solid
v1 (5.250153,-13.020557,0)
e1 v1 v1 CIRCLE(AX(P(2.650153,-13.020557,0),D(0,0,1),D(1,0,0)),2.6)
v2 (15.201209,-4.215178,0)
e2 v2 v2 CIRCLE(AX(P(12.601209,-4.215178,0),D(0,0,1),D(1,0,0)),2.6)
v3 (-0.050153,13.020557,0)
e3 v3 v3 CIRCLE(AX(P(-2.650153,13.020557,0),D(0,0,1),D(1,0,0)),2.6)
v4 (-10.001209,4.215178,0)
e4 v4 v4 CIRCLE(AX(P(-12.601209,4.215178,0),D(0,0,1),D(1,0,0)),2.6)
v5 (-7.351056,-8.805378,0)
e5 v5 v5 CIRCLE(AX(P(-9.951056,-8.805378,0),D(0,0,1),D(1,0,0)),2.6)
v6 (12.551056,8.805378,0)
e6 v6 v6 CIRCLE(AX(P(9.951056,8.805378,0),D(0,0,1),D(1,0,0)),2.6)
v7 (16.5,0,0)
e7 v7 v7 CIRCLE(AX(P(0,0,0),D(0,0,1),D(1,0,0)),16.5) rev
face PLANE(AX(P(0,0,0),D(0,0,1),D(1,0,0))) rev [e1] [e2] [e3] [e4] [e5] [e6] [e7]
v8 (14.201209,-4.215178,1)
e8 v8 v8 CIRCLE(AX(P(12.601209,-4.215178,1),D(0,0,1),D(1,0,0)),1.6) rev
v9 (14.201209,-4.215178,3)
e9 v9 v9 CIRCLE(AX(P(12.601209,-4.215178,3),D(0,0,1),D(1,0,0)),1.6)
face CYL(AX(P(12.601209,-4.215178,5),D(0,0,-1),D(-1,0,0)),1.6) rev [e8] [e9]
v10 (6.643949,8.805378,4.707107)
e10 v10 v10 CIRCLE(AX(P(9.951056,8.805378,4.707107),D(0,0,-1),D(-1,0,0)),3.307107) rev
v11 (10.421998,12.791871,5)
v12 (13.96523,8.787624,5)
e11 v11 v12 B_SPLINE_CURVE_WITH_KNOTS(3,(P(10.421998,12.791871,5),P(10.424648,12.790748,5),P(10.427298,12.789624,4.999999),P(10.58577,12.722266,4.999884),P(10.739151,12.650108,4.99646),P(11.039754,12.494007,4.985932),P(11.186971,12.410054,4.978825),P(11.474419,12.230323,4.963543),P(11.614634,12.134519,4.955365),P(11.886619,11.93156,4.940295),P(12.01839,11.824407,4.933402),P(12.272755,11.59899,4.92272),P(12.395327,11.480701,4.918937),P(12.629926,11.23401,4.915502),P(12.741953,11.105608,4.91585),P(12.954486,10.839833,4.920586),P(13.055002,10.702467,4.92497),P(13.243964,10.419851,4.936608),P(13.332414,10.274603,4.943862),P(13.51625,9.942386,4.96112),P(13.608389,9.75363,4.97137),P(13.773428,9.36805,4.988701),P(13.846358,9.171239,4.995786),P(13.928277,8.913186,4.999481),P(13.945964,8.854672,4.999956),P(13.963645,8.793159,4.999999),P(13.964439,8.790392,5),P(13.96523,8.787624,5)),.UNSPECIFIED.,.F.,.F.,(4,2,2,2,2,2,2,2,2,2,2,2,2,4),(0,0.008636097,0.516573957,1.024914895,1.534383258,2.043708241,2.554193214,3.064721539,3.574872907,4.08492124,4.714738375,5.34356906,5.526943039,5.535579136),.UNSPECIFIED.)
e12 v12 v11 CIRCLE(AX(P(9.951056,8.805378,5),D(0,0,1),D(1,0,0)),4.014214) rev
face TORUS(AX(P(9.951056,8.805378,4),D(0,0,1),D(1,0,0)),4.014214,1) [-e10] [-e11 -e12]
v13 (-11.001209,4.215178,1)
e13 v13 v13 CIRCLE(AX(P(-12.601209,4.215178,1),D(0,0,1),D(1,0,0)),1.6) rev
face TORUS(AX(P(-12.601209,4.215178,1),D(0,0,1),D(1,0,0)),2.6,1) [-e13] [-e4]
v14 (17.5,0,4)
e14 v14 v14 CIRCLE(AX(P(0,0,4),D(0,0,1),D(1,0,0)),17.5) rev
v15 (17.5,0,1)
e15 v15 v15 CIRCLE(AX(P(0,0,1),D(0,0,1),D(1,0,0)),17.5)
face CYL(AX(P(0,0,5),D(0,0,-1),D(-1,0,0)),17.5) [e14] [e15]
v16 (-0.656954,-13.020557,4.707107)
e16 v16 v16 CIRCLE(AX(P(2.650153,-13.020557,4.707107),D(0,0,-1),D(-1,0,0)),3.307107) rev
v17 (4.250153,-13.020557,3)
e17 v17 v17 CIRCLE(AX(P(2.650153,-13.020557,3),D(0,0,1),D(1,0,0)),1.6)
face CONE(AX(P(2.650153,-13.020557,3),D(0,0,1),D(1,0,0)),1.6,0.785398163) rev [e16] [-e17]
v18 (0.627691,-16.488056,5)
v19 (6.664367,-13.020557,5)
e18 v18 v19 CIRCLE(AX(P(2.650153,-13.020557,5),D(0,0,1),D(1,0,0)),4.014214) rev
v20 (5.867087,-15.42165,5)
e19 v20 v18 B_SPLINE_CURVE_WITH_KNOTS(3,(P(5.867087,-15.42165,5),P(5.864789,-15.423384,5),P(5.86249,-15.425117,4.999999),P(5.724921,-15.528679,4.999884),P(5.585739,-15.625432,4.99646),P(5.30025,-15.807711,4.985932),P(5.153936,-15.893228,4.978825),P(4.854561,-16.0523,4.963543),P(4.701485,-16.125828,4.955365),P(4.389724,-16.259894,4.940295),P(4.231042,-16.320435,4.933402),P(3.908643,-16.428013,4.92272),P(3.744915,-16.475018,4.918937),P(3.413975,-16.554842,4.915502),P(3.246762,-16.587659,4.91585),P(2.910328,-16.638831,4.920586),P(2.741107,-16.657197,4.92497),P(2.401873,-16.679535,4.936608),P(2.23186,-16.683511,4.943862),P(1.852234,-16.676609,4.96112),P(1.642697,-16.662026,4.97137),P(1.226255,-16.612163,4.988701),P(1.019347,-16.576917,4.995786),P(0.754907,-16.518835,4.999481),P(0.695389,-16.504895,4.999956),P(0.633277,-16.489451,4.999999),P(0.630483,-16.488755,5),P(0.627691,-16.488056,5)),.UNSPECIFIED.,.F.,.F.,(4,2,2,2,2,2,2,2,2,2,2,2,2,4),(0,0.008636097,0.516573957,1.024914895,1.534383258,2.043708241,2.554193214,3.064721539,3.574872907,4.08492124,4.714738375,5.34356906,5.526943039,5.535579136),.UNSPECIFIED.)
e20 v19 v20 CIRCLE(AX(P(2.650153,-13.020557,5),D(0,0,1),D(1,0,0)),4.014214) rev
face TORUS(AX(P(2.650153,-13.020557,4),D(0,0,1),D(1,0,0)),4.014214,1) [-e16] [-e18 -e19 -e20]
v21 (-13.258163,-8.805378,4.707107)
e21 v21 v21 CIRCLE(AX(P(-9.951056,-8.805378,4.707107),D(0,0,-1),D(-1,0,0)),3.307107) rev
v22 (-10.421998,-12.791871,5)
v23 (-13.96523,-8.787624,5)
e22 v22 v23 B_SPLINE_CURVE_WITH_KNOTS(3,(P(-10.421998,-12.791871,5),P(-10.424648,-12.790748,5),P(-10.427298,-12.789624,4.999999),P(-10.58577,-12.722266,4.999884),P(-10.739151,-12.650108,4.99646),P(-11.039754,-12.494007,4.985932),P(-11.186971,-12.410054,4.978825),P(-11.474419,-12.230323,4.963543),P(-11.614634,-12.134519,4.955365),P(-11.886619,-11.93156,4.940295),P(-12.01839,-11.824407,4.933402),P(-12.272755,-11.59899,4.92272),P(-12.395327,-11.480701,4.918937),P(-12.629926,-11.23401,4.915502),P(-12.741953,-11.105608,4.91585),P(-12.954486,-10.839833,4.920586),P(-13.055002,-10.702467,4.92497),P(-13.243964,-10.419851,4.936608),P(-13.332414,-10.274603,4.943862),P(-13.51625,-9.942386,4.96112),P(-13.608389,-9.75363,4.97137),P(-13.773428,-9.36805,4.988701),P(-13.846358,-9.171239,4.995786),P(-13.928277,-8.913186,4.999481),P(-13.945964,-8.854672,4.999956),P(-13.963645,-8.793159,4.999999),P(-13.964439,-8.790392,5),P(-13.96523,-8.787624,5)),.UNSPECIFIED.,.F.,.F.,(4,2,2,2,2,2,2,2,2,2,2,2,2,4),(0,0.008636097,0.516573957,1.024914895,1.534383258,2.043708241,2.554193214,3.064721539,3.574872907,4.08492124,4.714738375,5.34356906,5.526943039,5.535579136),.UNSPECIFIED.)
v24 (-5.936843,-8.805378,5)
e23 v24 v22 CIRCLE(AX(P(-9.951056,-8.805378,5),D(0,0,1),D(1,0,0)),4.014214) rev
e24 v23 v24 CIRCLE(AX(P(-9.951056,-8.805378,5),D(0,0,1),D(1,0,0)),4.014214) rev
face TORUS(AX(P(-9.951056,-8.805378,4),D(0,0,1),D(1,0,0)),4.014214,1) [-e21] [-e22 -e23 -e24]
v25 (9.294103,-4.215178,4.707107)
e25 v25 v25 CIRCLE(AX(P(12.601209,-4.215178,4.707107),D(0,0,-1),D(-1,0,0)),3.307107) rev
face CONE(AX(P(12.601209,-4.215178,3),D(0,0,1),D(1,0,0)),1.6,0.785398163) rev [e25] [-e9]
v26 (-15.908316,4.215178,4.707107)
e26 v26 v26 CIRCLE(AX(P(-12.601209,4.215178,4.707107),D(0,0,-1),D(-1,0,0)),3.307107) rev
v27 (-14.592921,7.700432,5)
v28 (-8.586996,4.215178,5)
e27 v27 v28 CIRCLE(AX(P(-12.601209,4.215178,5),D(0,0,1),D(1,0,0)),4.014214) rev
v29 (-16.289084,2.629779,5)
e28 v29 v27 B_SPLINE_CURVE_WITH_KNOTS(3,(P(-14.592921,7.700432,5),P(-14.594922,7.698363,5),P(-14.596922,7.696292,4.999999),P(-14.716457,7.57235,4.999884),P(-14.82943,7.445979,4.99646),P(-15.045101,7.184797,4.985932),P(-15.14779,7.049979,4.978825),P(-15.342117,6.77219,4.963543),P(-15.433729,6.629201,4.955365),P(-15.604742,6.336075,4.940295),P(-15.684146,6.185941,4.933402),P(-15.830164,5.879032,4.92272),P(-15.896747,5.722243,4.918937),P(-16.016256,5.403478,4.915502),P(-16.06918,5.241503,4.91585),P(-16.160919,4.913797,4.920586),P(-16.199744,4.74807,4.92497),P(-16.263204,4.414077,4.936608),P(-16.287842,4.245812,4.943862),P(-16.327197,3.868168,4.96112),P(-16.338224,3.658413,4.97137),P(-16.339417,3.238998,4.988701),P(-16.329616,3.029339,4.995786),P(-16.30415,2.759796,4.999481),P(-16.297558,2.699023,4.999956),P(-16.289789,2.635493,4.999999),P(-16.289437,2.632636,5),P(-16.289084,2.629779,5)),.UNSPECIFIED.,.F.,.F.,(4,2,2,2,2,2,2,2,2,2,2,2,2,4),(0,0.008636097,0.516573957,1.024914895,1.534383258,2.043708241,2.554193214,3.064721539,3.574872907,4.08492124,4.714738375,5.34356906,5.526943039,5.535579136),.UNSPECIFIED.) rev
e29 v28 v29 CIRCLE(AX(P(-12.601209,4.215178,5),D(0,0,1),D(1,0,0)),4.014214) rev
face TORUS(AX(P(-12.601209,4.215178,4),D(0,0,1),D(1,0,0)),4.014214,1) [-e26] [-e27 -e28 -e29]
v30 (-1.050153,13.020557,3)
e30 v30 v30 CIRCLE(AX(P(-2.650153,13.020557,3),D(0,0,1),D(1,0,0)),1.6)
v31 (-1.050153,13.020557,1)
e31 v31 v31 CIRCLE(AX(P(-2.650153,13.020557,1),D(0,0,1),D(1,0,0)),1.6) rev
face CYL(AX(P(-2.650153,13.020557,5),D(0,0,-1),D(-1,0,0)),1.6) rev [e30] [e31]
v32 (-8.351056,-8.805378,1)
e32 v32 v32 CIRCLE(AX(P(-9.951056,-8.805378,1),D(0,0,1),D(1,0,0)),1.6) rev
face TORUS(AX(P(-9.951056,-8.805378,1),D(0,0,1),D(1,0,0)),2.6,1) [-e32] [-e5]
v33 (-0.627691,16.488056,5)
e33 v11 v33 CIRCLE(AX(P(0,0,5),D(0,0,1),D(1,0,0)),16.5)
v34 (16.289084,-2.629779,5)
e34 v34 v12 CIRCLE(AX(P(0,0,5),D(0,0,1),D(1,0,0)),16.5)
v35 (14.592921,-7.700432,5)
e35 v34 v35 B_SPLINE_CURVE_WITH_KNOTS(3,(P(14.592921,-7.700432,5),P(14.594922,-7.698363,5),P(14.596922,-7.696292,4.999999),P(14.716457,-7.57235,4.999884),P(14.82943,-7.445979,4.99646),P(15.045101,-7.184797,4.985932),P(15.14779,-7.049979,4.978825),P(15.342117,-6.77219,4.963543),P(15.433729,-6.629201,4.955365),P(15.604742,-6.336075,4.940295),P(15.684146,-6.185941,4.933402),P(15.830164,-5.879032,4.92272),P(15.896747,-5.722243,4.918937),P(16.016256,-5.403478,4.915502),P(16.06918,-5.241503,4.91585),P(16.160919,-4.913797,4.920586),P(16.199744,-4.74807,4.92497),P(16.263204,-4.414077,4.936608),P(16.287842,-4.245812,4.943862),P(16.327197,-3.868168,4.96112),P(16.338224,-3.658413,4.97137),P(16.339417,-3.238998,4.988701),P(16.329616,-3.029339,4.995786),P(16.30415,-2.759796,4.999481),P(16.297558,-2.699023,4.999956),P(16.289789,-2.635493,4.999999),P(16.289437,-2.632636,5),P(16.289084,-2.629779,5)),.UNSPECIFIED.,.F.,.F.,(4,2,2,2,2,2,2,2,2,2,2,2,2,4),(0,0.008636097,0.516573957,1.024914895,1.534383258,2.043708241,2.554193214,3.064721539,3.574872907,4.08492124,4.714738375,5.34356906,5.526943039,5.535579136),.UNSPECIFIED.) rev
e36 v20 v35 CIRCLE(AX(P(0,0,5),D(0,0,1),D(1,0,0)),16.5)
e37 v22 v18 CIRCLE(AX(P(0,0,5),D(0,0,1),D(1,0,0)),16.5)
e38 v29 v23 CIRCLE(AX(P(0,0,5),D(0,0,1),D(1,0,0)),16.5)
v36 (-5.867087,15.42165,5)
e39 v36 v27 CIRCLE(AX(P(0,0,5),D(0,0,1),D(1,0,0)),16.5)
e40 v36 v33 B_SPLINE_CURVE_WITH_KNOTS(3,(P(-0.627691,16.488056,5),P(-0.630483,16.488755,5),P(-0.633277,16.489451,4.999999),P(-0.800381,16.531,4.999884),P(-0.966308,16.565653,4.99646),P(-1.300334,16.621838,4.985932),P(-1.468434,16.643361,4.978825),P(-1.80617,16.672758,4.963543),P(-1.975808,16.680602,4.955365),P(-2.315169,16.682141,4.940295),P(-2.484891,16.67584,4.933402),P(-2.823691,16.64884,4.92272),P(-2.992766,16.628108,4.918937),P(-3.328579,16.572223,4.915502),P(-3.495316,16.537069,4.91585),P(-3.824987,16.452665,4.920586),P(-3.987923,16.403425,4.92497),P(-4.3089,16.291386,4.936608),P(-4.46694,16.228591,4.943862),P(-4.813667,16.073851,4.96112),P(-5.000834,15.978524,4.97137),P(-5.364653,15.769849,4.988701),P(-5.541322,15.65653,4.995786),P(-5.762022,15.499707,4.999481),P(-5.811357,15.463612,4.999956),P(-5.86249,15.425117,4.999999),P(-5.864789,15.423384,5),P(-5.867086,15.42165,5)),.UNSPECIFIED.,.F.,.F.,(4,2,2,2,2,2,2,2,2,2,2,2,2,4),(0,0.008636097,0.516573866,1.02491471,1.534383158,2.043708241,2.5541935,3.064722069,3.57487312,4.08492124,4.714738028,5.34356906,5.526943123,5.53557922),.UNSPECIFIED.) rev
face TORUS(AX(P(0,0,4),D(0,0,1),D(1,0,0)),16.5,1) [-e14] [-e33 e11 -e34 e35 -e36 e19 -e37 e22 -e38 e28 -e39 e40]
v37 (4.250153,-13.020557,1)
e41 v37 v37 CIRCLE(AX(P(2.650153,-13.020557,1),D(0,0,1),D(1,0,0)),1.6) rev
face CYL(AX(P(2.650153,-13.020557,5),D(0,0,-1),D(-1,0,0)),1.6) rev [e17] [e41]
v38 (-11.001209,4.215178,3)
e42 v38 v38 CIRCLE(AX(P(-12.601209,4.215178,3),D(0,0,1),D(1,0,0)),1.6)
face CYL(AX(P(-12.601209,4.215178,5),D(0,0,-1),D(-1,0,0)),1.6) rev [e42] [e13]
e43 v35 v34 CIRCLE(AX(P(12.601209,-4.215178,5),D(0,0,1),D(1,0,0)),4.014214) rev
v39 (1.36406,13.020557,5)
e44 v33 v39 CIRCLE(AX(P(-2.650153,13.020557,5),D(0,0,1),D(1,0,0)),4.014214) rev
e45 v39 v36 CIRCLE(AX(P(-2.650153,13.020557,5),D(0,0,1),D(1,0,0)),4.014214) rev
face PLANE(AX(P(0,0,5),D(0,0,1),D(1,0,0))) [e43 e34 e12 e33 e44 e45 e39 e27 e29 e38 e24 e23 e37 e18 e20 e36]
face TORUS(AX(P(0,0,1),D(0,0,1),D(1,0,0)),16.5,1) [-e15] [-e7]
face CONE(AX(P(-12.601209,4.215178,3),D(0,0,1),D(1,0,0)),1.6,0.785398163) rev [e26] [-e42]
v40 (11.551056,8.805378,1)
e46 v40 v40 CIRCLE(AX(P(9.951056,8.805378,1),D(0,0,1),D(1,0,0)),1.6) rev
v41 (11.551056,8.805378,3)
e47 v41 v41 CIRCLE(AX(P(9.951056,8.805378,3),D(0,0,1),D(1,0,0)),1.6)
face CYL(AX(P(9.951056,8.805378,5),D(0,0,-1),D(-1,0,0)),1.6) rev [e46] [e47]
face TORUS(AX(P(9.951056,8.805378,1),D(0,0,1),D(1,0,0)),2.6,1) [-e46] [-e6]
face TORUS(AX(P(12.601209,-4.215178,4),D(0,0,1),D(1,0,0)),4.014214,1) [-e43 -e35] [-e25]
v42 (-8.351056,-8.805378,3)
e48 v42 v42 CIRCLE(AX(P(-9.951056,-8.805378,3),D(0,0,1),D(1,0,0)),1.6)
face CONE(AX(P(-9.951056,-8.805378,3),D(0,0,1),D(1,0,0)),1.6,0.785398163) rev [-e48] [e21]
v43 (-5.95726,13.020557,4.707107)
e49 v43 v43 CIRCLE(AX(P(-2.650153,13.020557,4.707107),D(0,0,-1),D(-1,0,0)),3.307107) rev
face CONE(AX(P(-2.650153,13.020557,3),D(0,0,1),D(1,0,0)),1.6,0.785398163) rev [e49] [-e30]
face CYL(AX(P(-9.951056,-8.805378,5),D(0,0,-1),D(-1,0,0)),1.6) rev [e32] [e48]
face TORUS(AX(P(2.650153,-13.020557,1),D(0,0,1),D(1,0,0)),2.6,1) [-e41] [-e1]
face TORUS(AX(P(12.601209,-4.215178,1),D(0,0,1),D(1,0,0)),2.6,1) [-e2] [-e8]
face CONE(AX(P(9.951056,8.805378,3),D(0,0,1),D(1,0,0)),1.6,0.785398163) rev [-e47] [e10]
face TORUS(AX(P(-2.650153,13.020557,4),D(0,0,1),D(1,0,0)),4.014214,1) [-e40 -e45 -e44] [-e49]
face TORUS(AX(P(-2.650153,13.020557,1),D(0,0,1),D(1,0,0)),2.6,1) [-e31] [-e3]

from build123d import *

# Parameters (mm, degrees)
ESQUISSE1_R        = 17.5
ESQUISSE1_R_2      = 1.6
BOSS_EXTRU_1_DEPTH = 5
CHANFREIN1_SIZE    = 2
CONG_2_R           = 1


with BuildPart() as part:
    # Esquisse1 → Boss.-Extru.1 (new body)
    with BuildSketch(Plane.XY):
        Circle(ESQUISSE1_R)
        with Locations((-2.65015328, 13.020556544)):
            Circle(ESQUISSE1_R_2, mode=Mode.SUBTRACT)
        with Locations((9.951056099, 8.805378336)):
            Circle(ESQUISSE1_R_2, mode=Mode.SUBTRACT)
        with Locations((12.601209379, -4.215178208)):
            Circle(ESQUISSE1_R_2, mode=Mode.SUBTRACT)
        with Locations((2.65015328, -13.020556544)):
            Circle(ESQUISSE1_R_2, mode=Mode.SUBTRACT)
        with Locations((-9.951056099, -8.805378336)):
            Circle(ESQUISSE1_R_2, mode=Mode.SUBTRACT)
        with Locations((-12.601209379, 4.215178208)):
            Circle(ESQUISSE1_R_2, mode=Mode.SUBTRACT)
    extrude(amount=BOSS_EXTRU_1_DEPTH)

    # Chanfrein1
    chanfrein1_edges = [part.edges().sort_by_distance(p)[0] for p in [
        (-14.201209379, 4.215178208, 5),
        (-11.551056099, -8.805378336, 5),
        (1.05015328, -13.020556544, 5),
        (11.001209379, -4.215178208, 5),
        (8.351056099, 8.805378336, 5),
        (-4.25015328, 13.020556544, 5),
    ]]
    chamfer(chanfrein1_edges, length=CHANFREIN1_SIZE)

    # Congé2
    # the kernel refuses this fillet: 1 mm, written as the material it takes off along each edge
    with BuildSketch(Plane(origin=(12.601209379, -4.215178208, 0), x_dir=(1, 0, 0), z_dir=(0, -1, 0))) as cong_2_piece_1:
        with BuildLine():
            CenterArc((1.6 + CONG_2_R, CONG_2_R), CONG_2_R, 180, 90)
            Line((1.6, CONG_2_R), (1.6, 0))
            Line((1.6, 0), (1.6 + CONG_2_R, 0))
        make_face()
    revolve(axis=Axis((12.601209379, -4.215178208, 0), (0, 0, 1)), mode=Mode.SUBTRACT)
    with BuildSketch(Plane(origin=(2.65015328, -13.020556544, 0), x_dir=(1, 0, 0), z_dir=(0, -1, 0))) as cong_2_piece_2:
        with BuildLine():
            CenterArc((1.6 + CONG_2_R, CONG_2_R), CONG_2_R, 180, 90)
            Line((1.6, CONG_2_R), (1.6, 0))
            Line((1.6, 0), (1.6 + CONG_2_R, 0))
        make_face()
    revolve(axis=Axis((2.65015328, -13.020556544, 0), (0, 0, 1)), mode=Mode.SUBTRACT)
    with BuildSketch(Plane(origin=(-9.951056099, -8.805378336, 0), x_dir=(1, 0, 0), z_dir=(0, -1, 0))) as cong_2_piece_3:
        with BuildLine():
            CenterArc((1.6 + CONG_2_R, CONG_2_R), CONG_2_R, 180, 90)
            Line((1.6, CONG_2_R), (1.6, 0))
            Line((1.6, 0), (1.6 + CONG_2_R, 0))
        make_face()
    revolve(axis=Axis((-9.951056099, -8.805378336, 0), (0, 0, 1)), mode=Mode.SUBTRACT)
    with BuildSketch(Plane(origin=(-12.601209379, 4.215178208, 0), x_dir=(1, 0, 0), z_dir=(0, -1, 0))) as cong_2_piece_4:
        with BuildLine():
            CenterArc((1.6 + CONG_2_R, CONG_2_R), CONG_2_R, 180, 90)
            Line((1.6, CONG_2_R), (1.6, 0))
            Line((1.6, 0), (1.6 + CONG_2_R, 0))
        make_face()
    revolve(axis=Axis((-12.601209379, 4.215178208, 0), (0, 0, 1)), mode=Mode.SUBTRACT)
    with BuildSketch(Plane(origin=(-12.601209379, 4.215178208, 5), x_dir=(1, 0, 0), z_dir=(0, -1, 0))) as cong_2_piece_5:
        with BuildLine():
            CenterArc((3.6 + CONG_2_R * 0.414213562373, -CONG_2_R), CONG_2_R, 90, 45)
            Line((3.6 - CONG_2_R * 0.292893218813, -CONG_2_R * 0.292893218813), (3.6, 0))
            Line((3.6, 0), (3.6 + CONG_2_R * 0.414213562373, 0))
        make_face()
    revolve(axis=Axis((-12.601209379, 4.215178208, 5), (0, 0, 1)), mode=Mode.SUBTRACT)
    with BuildSketch(Plane(origin=(-9.951056099, -8.805378336, 5), x_dir=(1, 0, 0), z_dir=(0, -1, 0))) as cong_2_piece_6:
        with BuildLine():
            CenterArc((3.6 + CONG_2_R * 0.414213562373, -CONG_2_R), CONG_2_R, 90, 45)
            Line((3.6 - CONG_2_R * 0.292893218813, -CONG_2_R * 0.292893218813), (3.6, 0))
            Line((3.6, 0), (3.6 + CONG_2_R * 0.414213562373, 0))
        make_face()
    revolve(axis=Axis((-9.951056099, -8.805378336, 5), (0, 0, 1)), mode=Mode.SUBTRACT)
    with BuildSketch(Plane(origin=(2.65015328, -13.020556544, 5), x_dir=(1, 0, 0), z_dir=(0, -1, 0))) as cong_2_piece_7:
        with BuildLine():
            CenterArc((3.6 + CONG_2_R * 0.414213562373, -CONG_2_R), CONG_2_R, 90, 45)
            Line((3.6 - CONG_2_R * 0.292893218813, -CONG_2_R * 0.292893218813), (3.6, 0))
            Line((3.6, 0), (3.6 + CONG_2_R * 0.414213562373, 0))
        make_face()
    revolve(axis=Axis((2.65015328, -13.020556544, 5), (0, 0, 1)), mode=Mode.SUBTRACT)
    with BuildSketch(Plane(origin=(12.601209379, -4.215178208, 5), x_dir=(1, 0, 0), z_dir=(0, -1, 0))) as cong_2_piece_8:
        with BuildLine():
            CenterArc((3.6 + CONG_2_R * 0.414213562373, -CONG_2_R), CONG_2_R, 90, 45)
            Line((3.6 - CONG_2_R * 0.292893218813, -CONG_2_R * 0.292893218813), (3.6, 0))
            Line((3.6, 0), (3.6 + CONG_2_R * 0.414213562373, 0))
        make_face()
    revolve(axis=Axis((12.601209379, -4.215178208, 5), (0, 0, 1)), mode=Mode.SUBTRACT)
    with BuildSketch(Plane(origin=(9.951056099, 8.805378336, 5), x_dir=(1, 0, 0), z_dir=(0, -1, 0))) as cong_2_piece_9:
        with BuildLine():
            CenterArc((3.6 + CONG_2_R * 0.414213562373, -CONG_2_R), CONG_2_R, 90, 45)
            Line((3.6 - CONG_2_R * 0.292893218813, -CONG_2_R * 0.292893218813), (3.6, 0))
            Line((3.6, 0), (3.6 + CONG_2_R * 0.414213562373, 0))
        make_face()
    revolve(axis=Axis((9.951056099, 8.805378336, 5), (0, 0, 1)), mode=Mode.SUBTRACT)
    with BuildSketch(Plane(origin=(-2.65015328, 13.020556544, 5), x_dir=(1, 0, 0), z_dir=(0, -1, 0))) as cong_2_piece_10:
        with BuildLine():
            CenterArc((3.6 + CONG_2_R * 0.414213562373, -CONG_2_R), CONG_2_R, 90, 45)
            Line((3.6 + CONG_2_R * 0.414213562373, 0), (3.6, 0))
            Line((3.6, 0), (3.6 - CONG_2_R * 0.292893218813, -CONG_2_R * 0.292893218813))
        make_face()
    revolve(axis=Axis((-2.65015328, 13.020556544, 5), (0, 0, 1)), mode=Mode.SUBTRACT)
    with BuildSketch(Plane(origin=(0, 0, 5), x_dir=(1, 0, 0), z_dir=(0, -1, 0))) as cong_2_piece_11:
        with BuildLine():
            CenterArc((17.5 - CONG_2_R, -CONG_2_R), CONG_2_R, 0, 90)
            Line((17.5, -CONG_2_R), (17.5, 0))
            Line((17.5, 0), (17.5 - CONG_2_R, 0))
        make_face()
    revolve(axis=Axis((0, 0, 5), (0, 0, 1)), mode=Mode.SUBTRACT)
    with BuildSketch(Plane(origin=(0, 0, 0), x_dir=(1, 0, 0), z_dir=(0, -1, 0))) as cong_2_piece_12:
        with BuildLine():
            CenterArc((17.5 - CONG_2_R, CONG_2_R), CONG_2_R, 270, 90)
            Line((17.5, CONG_2_R), (17.5, 0))
            Line((17.5, 0), (17.5 - CONG_2_R, 0))
        make_face()
    revolve(axis=Axis((0, 0, 0), (0, 0, 1)), mode=Mode.SUBTRACT)
    with BuildSketch(Plane(origin=(-2.65015328, 13.020556544, 0), x_dir=(1, 0, 0), z_dir=(0, -1, 0))) as cong_2_piece_13:
        with BuildLine():
            CenterArc((1.6 + CONG_2_R, CONG_2_R), CONG_2_R, 180, 90)
            Line((1.6 + CONG_2_R, 0), (1.6, 0))
            Line((1.6, 0), (1.6, CONG_2_R))
        make_face()
    revolve(axis=Axis((-2.65015328, 13.020556544, 0), (0, 0, 1)), mode=Mode.SUBTRACT)
    with BuildSketch(Plane(origin=(9.951056099, 8.805378336, 0), x_dir=(1, 0, 0), z_dir=(0, -1, 0))) as cong_2_piece_14:
        with BuildLine():
            CenterArc((1.6 + CONG_2_R, CONG_2_R), CONG_2_R, 180, 90)
            Line((1.6, CONG_2_R), (1.6, 0))
            Line((1.6, 0), (1.6 + CONG_2_R, 0))
        make_face()
    revolve(axis=Axis((9.951056099, 8.805378336, 0), (0, 0, 1)), mode=Mode.SUBTRACT)


solid = part.part
